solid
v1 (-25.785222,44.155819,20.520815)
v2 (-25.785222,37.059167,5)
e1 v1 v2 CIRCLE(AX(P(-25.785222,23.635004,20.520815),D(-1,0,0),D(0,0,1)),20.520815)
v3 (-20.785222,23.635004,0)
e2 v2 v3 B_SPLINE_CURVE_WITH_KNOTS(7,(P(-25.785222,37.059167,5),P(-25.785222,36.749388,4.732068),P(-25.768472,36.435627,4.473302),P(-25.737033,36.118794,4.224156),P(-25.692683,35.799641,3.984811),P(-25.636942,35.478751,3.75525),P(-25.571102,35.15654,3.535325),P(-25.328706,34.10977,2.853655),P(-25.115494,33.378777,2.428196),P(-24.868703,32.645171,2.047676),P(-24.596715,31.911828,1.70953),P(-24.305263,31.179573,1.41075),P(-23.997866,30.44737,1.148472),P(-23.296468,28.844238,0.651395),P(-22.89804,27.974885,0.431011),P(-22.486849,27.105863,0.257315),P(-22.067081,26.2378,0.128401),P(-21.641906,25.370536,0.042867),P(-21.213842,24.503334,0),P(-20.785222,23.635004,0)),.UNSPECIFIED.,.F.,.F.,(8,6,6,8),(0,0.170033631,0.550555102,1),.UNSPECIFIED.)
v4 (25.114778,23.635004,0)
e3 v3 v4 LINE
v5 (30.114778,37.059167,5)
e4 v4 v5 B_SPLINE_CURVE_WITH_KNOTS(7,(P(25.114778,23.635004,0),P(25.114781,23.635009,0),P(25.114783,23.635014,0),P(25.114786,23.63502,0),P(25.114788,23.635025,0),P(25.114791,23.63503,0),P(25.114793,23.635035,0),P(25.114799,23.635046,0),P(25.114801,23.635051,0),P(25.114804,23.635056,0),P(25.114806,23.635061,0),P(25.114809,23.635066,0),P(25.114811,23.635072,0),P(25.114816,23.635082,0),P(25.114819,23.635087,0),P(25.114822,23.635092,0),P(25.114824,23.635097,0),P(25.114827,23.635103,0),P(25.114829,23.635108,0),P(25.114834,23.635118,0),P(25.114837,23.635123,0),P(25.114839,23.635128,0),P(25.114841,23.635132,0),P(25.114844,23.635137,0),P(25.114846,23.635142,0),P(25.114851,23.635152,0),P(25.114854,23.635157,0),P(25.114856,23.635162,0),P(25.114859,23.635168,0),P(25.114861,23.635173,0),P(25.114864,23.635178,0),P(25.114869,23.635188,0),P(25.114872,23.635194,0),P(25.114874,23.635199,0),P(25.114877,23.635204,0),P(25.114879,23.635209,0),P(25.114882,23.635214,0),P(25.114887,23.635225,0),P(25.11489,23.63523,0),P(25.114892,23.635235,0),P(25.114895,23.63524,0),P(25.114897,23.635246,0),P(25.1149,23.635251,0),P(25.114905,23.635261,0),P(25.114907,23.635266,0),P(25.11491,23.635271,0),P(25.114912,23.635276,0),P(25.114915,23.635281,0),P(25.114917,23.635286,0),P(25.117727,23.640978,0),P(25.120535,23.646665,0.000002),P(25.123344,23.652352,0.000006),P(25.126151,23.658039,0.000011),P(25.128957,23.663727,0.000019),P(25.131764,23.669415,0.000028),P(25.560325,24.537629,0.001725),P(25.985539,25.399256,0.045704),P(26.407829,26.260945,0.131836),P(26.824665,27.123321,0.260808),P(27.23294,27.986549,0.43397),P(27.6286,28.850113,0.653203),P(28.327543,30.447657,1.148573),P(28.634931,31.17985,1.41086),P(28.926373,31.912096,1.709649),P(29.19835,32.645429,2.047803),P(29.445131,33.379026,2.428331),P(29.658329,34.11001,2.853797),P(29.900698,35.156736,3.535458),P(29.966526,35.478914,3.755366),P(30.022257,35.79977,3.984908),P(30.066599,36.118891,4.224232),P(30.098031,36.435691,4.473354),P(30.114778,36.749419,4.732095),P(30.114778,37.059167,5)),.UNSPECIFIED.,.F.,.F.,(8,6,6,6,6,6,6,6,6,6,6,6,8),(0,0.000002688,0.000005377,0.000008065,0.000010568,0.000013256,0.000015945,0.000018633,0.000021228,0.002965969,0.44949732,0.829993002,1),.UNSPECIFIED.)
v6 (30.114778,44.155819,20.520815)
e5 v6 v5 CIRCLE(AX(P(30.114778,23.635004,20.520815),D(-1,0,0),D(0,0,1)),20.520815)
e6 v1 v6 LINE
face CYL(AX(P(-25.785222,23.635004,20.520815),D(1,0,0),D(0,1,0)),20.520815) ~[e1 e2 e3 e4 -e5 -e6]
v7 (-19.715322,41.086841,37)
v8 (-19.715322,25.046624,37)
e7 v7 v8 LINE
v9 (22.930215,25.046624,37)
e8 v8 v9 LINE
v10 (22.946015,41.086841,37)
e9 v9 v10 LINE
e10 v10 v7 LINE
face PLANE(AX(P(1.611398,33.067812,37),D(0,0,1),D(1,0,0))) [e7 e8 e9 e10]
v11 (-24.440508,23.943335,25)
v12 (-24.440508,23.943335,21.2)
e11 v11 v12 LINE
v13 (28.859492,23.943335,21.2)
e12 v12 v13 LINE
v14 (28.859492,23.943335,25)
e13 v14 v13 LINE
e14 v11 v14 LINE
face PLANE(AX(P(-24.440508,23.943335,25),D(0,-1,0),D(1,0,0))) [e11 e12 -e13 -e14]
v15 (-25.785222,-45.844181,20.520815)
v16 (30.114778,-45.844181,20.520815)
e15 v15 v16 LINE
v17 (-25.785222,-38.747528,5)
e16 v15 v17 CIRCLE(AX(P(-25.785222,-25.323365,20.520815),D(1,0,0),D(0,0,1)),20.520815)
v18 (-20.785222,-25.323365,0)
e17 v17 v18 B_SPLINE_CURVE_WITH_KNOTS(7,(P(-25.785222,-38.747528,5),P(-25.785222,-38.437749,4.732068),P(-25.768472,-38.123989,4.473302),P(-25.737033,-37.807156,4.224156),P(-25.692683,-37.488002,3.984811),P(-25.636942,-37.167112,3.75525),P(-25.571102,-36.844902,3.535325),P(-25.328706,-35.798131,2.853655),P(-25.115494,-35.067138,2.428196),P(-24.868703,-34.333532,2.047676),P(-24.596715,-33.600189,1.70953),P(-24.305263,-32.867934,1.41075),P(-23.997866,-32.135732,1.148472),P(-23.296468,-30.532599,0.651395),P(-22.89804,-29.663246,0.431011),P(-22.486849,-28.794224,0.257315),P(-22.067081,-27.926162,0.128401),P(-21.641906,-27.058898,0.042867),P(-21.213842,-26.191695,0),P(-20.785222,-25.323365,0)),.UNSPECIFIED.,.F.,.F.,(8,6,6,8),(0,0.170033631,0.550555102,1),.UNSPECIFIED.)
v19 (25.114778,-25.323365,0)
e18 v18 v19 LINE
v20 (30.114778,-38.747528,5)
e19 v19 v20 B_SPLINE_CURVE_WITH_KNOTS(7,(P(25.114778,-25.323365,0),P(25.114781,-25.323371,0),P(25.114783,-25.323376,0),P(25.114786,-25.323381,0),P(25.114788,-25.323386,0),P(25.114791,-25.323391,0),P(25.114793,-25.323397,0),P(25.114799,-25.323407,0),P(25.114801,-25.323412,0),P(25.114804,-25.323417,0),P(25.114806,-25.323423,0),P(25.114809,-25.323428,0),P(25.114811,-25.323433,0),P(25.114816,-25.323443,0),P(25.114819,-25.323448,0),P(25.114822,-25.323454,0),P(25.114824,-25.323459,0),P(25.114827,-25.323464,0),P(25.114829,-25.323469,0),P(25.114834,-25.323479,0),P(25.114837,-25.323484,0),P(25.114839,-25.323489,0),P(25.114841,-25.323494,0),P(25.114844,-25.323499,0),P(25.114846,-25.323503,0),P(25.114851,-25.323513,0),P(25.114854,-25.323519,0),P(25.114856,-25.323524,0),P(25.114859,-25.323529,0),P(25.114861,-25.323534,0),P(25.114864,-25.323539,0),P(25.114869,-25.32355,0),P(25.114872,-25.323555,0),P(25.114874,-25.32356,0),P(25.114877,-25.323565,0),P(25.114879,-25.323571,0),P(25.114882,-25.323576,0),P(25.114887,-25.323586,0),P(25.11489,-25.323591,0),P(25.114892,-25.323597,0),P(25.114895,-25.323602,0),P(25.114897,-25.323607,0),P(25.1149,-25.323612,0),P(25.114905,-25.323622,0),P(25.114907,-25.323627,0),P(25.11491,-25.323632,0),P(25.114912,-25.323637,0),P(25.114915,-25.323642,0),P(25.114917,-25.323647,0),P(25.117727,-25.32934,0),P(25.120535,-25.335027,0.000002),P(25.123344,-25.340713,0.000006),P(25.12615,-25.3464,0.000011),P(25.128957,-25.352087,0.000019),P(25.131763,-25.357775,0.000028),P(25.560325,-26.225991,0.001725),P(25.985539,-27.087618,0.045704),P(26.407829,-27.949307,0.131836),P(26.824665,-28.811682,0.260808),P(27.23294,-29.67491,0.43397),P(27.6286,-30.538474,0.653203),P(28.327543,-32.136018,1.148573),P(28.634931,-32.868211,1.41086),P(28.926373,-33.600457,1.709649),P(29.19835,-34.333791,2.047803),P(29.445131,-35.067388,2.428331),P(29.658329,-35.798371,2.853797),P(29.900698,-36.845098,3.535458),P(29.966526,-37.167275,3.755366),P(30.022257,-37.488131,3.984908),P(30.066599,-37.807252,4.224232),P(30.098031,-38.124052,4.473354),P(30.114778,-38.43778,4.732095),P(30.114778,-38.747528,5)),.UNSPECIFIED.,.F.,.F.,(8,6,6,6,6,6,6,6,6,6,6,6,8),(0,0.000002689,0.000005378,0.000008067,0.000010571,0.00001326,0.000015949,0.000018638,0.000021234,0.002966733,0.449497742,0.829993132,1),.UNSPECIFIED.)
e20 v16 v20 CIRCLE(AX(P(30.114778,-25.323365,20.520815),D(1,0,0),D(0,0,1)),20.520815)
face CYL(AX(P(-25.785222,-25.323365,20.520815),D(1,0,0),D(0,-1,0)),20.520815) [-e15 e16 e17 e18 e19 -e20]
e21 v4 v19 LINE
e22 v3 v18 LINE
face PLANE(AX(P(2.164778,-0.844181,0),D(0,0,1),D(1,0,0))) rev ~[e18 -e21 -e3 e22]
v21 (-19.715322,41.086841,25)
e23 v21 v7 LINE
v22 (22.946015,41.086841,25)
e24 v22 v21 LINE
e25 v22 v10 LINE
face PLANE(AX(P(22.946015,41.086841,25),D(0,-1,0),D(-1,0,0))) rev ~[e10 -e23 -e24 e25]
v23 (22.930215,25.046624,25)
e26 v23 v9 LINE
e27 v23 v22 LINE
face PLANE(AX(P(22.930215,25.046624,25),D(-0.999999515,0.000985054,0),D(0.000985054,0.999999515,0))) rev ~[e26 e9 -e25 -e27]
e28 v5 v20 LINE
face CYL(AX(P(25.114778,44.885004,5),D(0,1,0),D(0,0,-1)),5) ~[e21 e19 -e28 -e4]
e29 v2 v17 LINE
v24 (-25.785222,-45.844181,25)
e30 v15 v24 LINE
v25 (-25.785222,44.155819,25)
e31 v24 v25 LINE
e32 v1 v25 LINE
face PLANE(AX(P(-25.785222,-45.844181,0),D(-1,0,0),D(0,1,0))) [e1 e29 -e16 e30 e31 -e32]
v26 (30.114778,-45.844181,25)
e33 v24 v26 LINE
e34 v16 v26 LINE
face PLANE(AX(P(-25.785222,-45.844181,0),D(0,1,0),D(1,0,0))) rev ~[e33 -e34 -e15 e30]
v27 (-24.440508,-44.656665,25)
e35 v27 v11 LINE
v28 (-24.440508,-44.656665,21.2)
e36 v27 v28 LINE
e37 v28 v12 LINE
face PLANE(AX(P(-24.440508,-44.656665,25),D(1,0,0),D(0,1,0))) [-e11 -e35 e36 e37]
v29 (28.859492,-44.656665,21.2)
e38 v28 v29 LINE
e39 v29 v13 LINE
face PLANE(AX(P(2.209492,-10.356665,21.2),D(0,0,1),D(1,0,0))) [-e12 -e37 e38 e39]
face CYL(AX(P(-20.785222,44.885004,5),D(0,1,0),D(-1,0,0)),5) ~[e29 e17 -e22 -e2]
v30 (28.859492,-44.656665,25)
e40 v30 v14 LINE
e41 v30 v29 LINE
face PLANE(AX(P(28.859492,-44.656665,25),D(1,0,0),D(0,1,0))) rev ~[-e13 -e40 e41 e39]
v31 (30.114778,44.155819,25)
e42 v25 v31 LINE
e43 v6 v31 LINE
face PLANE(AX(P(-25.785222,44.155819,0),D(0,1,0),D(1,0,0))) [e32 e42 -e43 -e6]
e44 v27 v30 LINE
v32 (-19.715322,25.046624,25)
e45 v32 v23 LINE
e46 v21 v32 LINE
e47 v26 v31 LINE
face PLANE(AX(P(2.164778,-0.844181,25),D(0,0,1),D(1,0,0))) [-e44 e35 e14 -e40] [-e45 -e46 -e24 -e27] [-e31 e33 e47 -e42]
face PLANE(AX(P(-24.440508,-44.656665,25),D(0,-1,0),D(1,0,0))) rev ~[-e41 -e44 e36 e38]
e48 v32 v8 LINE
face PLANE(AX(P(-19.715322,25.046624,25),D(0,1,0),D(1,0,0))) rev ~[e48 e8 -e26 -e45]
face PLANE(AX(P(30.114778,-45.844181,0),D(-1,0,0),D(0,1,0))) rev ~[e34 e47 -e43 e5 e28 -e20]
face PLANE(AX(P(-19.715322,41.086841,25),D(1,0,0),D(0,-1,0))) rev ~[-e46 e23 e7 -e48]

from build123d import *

# Parameters (mm, degrees)
F0_W        = 55.9
F0_H        = 90
F1_DEPTH    = 25
F2_R        = 20.5208152802
F3_W        = 53.3
F3_H        = 68.6
F4_DEPTH    = 3.8
F5_T1_DEPTH = 91.4583694397
F6_T1_DEPTH = 91.4583694397
F8_DEPTH    = 12


# Not quite as in the source:
# - a fillet or chamfer that OpenCascade refuses, or shapes differently, is made with other operations: its cross-section is extruded or revolved along the edge and cut away or added


with BuildPart() as f1:
    # F0 (on Top) → F1 (new body)
    with BuildSketch(Plane.XY):
        with Locations((2.1647780098, -0.8441807004)):
            Rectangle(F0_W, F0_H)
    extrude(amount=F1_DEPTH)

    # F2
    f2_edges = [f1.edges().sort_by_distance(p)[0] for p in [
        (2.164778, -45.844181, 0),
        (2.164778, 44.155819, 0),
    ]]
    fillet(f2_edges, radius=F2_R)

    # F3 (on face) → F4 (cut)
    with BuildSketch(Plane.XY.offset(25)):
        with Locations((2.2094916642, -10.3566651821)):
            Rectangle(F3_W, F3_H)
    extrude(amount=-F4_DEPTH, mode=Mode.SUBTRACT)

    # F5: fillet of radius 5 on 1 edges, made by hand

    # F5_s2 → F5_t1 (cut)
    with BuildSketch(Plane.XZ.offset(-44.8850040195)):
        with BuildLine():
            ThreePointArc((25.1147780098, 0), (28.6503119157, 1.4644660941), (30.1147780098, 5))
            Line((30.1147780098, 5), (30.1147780098, 0))
            Line((30.1147780098, 0), (25.1147780098, 0))
        make_face()
    extrude(amount=F5_T1_DEPTH, mode=Mode.SUBTRACT)

    # F6: fillet of radius 5 on 1 edges, made by hand

    # F6_s2 → F6_t1 (cut)
    with BuildSketch(Plane.XZ.offset(-44.8850040195)):
        with BuildLine():
            ThreePointArc((-25.7852219902, 5), (-24.3207558961, 1.4644660941), (-20.7852219902, 0))
            Line((-20.7852219902, 0), (-25.7852219902, 0))
            Line((-25.7852219902, 0), (-25.7852219902, 5))
        make_face()
    extrude(amount=F6_T1_DEPTH, mode=Mode.SUBTRACT)

    # F7 (on face) → F8 (join)
    with BuildSketch(Plane.XY.offset(25)):
        Polygon((22.9460150003, 41.0868413746), (-19.7153221816, 41.0868413746), (-19.7153221816, 25.0466242433), (22.930214506, 25.0466242433), align=None)
    extrude(amount=F8_DEPTH)


solid = f1.part
